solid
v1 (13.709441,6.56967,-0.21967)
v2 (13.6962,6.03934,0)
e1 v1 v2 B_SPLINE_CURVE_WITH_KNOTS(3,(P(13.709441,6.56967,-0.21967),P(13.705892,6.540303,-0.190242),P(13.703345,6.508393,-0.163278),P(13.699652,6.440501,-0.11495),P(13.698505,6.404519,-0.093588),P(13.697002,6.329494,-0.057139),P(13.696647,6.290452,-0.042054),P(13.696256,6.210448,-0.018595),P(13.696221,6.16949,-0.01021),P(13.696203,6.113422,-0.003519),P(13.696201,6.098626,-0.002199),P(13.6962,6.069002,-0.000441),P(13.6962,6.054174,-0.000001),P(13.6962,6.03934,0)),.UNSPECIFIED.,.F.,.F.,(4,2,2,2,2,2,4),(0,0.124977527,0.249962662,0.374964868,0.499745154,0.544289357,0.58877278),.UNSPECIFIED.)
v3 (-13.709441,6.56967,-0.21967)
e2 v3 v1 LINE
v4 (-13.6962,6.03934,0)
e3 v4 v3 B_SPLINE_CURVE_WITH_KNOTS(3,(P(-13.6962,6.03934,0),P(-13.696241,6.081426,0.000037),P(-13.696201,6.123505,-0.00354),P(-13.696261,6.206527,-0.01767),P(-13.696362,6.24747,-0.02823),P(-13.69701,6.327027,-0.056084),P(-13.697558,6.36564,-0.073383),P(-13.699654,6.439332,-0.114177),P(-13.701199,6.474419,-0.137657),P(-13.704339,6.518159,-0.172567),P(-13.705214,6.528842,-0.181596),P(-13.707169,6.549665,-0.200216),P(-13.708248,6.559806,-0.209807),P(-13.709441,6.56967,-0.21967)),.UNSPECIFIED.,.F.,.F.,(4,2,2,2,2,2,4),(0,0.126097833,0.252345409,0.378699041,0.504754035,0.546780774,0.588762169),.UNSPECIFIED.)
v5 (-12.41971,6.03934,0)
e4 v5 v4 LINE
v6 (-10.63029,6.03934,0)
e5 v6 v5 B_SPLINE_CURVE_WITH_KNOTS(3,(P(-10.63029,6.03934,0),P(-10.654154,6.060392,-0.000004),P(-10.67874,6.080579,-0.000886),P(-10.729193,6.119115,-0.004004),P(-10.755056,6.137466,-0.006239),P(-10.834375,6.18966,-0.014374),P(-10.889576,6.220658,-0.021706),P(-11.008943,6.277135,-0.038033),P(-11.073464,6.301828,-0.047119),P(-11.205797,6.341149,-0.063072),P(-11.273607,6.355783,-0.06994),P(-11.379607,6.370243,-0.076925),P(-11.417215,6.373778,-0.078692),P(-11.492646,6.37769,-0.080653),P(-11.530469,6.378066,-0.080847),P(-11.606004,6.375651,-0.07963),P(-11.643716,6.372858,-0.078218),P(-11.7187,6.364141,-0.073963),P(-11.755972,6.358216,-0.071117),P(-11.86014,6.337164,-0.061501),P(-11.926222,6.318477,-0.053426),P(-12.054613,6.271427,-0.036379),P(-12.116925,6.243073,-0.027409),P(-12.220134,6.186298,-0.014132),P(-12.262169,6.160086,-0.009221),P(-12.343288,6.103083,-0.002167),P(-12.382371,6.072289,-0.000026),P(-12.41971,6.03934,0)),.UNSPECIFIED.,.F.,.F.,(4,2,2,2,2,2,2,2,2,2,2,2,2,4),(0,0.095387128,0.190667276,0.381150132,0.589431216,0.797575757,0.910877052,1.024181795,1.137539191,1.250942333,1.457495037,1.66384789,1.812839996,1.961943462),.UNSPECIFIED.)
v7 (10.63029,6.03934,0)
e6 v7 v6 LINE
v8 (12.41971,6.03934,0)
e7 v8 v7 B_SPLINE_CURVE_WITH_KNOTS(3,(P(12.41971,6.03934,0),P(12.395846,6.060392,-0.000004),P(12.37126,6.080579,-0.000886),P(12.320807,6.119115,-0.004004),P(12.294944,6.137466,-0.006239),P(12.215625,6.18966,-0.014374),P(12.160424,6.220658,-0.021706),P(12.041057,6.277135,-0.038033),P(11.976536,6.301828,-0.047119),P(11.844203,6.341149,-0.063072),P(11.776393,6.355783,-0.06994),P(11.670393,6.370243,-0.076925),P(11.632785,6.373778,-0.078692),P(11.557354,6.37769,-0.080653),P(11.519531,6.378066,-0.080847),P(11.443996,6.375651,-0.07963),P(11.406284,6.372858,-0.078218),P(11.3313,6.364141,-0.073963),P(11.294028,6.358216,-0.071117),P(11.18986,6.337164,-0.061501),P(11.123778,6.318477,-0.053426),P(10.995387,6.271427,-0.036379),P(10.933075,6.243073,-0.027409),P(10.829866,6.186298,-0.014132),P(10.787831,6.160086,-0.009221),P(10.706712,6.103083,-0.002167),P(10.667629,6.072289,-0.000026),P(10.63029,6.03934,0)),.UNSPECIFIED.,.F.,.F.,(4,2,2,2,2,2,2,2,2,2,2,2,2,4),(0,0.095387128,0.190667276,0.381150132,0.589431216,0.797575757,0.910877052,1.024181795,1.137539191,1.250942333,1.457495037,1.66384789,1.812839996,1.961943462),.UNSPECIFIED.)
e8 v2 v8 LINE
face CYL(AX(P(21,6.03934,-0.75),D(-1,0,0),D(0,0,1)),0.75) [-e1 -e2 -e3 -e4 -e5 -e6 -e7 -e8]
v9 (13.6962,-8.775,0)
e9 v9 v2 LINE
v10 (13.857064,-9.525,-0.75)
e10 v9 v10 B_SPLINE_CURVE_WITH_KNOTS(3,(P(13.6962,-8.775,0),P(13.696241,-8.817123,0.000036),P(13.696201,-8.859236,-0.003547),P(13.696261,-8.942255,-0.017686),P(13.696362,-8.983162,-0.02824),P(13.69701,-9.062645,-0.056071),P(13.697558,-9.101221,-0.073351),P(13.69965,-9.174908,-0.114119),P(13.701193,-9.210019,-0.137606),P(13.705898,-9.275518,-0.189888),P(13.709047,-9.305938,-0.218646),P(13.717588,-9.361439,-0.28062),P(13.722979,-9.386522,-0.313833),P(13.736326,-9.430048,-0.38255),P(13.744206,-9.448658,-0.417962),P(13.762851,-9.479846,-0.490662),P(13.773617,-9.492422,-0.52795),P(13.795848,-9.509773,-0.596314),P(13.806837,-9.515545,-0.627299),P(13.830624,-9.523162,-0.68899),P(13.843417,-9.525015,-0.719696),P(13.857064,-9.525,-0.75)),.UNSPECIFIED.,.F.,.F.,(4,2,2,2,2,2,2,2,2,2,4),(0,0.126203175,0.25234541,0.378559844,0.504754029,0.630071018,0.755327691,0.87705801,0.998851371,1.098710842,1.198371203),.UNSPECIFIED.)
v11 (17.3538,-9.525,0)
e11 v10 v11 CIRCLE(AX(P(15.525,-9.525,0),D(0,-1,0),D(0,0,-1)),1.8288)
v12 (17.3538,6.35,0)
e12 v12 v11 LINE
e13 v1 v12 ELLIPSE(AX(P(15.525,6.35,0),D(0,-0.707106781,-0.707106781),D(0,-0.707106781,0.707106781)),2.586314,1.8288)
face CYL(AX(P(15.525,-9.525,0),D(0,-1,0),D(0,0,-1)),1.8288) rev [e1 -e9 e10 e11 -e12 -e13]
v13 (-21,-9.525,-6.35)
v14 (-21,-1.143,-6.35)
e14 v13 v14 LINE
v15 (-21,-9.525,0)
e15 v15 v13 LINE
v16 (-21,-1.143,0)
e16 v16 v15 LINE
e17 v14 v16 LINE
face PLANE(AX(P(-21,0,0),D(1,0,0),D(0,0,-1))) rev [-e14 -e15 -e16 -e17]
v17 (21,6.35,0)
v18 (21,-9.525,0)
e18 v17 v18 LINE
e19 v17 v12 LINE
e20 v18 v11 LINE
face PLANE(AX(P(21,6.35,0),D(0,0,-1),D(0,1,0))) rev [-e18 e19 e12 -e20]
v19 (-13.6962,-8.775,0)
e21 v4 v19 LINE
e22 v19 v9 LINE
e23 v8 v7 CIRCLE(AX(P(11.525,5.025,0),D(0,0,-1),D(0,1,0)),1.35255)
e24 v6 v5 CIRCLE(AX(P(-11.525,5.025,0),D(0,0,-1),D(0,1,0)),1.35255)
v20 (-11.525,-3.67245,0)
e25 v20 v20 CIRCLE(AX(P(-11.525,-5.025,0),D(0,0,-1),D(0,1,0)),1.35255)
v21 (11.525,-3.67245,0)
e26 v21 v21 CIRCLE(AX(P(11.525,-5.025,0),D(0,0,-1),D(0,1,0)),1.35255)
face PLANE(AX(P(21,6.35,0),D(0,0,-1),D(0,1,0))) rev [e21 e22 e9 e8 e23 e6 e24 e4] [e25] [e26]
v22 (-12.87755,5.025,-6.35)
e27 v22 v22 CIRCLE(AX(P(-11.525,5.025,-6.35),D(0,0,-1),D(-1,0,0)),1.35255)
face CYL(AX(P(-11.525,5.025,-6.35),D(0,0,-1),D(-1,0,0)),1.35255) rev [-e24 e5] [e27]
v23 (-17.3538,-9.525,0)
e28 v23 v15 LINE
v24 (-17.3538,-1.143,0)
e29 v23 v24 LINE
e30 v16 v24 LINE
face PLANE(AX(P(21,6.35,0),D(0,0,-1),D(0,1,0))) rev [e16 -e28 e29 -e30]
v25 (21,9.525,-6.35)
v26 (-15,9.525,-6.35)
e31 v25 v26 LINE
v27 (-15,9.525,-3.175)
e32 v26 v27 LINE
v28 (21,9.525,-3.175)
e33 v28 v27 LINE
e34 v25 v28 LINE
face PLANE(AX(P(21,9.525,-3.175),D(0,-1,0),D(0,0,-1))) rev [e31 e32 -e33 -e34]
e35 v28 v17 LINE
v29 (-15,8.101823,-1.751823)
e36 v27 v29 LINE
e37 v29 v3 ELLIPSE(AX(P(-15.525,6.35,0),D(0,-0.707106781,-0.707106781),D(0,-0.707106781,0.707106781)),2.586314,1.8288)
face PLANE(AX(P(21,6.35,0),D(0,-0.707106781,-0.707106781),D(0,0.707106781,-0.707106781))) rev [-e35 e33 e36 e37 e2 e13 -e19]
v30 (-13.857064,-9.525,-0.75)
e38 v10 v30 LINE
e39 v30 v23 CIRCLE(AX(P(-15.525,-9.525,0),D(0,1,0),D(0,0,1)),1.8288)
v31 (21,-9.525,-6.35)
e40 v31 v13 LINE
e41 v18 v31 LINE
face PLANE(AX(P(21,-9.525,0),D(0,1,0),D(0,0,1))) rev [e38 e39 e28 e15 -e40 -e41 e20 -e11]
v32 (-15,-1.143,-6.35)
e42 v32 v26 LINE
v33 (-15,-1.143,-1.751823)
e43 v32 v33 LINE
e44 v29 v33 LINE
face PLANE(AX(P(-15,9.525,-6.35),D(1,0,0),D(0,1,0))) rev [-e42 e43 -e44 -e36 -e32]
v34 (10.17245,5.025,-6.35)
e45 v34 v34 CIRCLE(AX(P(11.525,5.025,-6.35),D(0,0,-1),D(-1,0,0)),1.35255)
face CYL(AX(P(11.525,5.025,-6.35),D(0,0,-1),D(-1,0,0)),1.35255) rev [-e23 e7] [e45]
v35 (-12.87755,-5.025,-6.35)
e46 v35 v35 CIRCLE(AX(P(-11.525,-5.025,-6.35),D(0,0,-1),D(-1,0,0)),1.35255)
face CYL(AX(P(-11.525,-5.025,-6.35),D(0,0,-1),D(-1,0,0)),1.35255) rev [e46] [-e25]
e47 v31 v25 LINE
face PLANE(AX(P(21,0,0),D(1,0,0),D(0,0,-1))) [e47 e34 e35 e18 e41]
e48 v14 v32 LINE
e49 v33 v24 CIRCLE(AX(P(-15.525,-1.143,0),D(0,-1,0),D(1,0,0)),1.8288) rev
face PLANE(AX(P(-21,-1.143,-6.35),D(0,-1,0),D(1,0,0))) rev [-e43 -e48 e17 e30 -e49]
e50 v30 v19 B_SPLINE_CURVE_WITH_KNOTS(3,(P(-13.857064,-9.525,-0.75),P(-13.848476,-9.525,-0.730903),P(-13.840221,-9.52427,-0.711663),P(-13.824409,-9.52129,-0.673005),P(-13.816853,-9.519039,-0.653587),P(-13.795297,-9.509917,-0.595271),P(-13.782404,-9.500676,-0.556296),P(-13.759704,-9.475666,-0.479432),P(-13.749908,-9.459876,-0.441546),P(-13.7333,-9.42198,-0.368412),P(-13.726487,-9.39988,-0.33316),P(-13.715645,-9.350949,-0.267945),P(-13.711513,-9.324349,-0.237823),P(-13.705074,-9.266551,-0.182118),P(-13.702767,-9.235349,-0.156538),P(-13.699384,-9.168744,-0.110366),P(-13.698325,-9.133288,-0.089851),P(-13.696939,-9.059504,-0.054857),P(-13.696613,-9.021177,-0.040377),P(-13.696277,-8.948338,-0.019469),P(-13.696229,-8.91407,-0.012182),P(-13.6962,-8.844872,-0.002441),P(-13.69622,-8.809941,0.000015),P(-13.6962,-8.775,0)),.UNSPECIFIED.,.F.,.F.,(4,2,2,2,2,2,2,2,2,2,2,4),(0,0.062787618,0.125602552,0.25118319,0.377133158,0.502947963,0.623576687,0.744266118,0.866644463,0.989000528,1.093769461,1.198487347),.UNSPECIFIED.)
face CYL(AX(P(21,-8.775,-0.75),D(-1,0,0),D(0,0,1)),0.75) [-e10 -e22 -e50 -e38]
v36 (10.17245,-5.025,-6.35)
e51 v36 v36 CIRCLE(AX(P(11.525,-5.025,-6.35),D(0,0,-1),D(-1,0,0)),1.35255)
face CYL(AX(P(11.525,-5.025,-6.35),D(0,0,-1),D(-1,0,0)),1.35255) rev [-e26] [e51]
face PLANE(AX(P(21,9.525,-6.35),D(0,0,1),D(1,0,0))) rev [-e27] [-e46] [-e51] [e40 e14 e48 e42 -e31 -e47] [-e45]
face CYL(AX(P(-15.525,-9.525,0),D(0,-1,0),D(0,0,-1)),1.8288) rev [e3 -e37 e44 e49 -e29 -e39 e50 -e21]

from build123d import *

# Parameters (mm, degrees)
BOSS_EXTRUDE1_DEPTH       = 21
F_6_32_TAPPED_HOLE1_D     = 2.7051
F_6_32_TAPPED_HOLE1_DEPTH = 9.398
F_6_32_TAPPED_HOLE1_TIP   = 0.81269403
F_6_CLEARANCE_HOLE1_D     = 3.6576
FILLET1_R                 = 0.75
SKETCH8_W                 = 6
SKETCH8_H                 = 10.668
CUT_EXTRUDE1_DEPTH        = 24.917527635


with BuildPart() as part:
    # Sketch1 → Boss-Extrude1 (new, symmetric)
    with BuildSketch(Plane(origin=(0, 0, 0), x_dir=(0, 0, -1), z_dir=(1, 0, 0))):
        Polygon((0, 6.35), (3.175, 9.525), (6.35, 9.525), (6.35, -9.525), (0, -9.525), align=None)
    extrude(amount=BOSS_EXTRUDE1_DEPTH, both=True)

    # #6-32 Tapped Hole1
    with Locations(Plane(origin=(0, 0, -6.35), x_dir=(-1, 0, 0), z_dir=(0, 0, -1))):
        with Locations((11.525, -5.025), (-11.525, 5.025), (-11.525, -5.025), (11.525, 5.025)):
            Hole(F_6_32_TAPPED_HOLE1_D / 2, depth=F_6_32_TAPPED_HOLE1_DEPTH)
            with Locations((0, 0, -(F_6_32_TAPPED_HOLE1_DEPTH + F_6_32_TAPPED_HOLE1_TIP / 2))):  # 118° drill point
                Cone(0, F_6_32_TAPPED_HOLE1_D / 2, F_6_32_TAPPED_HOLE1_TIP, mode=Mode.SUBTRACT)

    # #6 Clearance Hole1 (through all)
    with Locations(Plane(origin=(0, -9.525, 0), x_dir=(-1, 0, 0), z_dir=(0, -1, 0))):
        with Locations((-15.525, 0), (15.525, 0)):
            Hole(F_6_CLEARANCE_HOLE1_D / 2)

    # Fillet1
    # the kernel refuses this fillet: 0.75 mm, written as the material it takes off along each edge
    with BuildSketch(Plane(origin=(-14.472850429, 6.35, 0), x_dir=(0, 0.707106781186552, -0.7071067811865431), z_dir=(1, 0, 0)), Plane(origin=(11.019949465, 6.35, 0), x_dir=(0, 0.707106781186552, -0.7071067811865431), z_dir=(1, 0, 0))) as fillet1_piece_1:
        with BuildLine():
            CenterArc((FILLET1_R * 0.414213562373, -FILLET1_R), FILLET1_R, 90, 45)
            Line((-FILLET1_R * 0.292893218813, -FILLET1_R * 0.292893218813), (0, 0))
            Line((0, 0), (FILLET1_R * 0.414213562373, 0))
        make_face()
    extrude(amount=3.452900965, mode=Mode.SUBTRACT)
    with BuildSketch(Plane(origin=(-12.030050535, 6.35, 0), x_dir=(0, 0.707106781186552, -0.7071067811865431), z_dir=(1, 0, 0))) as fillet1_piece_2:
        with BuildLine():
            CenterArc((FILLET1_R * 0.414213562373, -FILLET1_R), FILLET1_R, 90, 45)
            Line((-FILLET1_R * 0.292893218813, -FILLET1_R * 0.292893218813), (0, 0))
            Line((0, 0), (FILLET1_R * 0.414213562373, 0))
        make_face()
    extrude(amount=24.060101071, mode=Mode.SUBTRACT)
    with BuildSketch(Plane(origin=(-15.5712, -9.525, 0), x_dir=(0, 1, 0), z_dir=(1, 0, 0))) as fillet1_piece_3:
        with BuildLine():
            CenterArc((FILLET1_R, -FILLET1_R), FILLET1_R, 90, 90)
            Line((0, -FILLET1_R), (0, 0))
            Line((0, 0), (FILLET1_R, 0))
        make_face()
    extrude(amount=31.1424, mode=Mode.SUBTRACT)

    # Sketch8 → Cut-Extrude1 (cut, through all)
    with BuildSketch(Plane.XY):
        with Locations((-18, 4.191)):
            Rectangle(SKETCH8_W, SKETCH8_H)
    extrude(amount=-CUT_EXTRUDE1_DEPTH, mode=Mode.SUBTRACT)


solid = part.part
